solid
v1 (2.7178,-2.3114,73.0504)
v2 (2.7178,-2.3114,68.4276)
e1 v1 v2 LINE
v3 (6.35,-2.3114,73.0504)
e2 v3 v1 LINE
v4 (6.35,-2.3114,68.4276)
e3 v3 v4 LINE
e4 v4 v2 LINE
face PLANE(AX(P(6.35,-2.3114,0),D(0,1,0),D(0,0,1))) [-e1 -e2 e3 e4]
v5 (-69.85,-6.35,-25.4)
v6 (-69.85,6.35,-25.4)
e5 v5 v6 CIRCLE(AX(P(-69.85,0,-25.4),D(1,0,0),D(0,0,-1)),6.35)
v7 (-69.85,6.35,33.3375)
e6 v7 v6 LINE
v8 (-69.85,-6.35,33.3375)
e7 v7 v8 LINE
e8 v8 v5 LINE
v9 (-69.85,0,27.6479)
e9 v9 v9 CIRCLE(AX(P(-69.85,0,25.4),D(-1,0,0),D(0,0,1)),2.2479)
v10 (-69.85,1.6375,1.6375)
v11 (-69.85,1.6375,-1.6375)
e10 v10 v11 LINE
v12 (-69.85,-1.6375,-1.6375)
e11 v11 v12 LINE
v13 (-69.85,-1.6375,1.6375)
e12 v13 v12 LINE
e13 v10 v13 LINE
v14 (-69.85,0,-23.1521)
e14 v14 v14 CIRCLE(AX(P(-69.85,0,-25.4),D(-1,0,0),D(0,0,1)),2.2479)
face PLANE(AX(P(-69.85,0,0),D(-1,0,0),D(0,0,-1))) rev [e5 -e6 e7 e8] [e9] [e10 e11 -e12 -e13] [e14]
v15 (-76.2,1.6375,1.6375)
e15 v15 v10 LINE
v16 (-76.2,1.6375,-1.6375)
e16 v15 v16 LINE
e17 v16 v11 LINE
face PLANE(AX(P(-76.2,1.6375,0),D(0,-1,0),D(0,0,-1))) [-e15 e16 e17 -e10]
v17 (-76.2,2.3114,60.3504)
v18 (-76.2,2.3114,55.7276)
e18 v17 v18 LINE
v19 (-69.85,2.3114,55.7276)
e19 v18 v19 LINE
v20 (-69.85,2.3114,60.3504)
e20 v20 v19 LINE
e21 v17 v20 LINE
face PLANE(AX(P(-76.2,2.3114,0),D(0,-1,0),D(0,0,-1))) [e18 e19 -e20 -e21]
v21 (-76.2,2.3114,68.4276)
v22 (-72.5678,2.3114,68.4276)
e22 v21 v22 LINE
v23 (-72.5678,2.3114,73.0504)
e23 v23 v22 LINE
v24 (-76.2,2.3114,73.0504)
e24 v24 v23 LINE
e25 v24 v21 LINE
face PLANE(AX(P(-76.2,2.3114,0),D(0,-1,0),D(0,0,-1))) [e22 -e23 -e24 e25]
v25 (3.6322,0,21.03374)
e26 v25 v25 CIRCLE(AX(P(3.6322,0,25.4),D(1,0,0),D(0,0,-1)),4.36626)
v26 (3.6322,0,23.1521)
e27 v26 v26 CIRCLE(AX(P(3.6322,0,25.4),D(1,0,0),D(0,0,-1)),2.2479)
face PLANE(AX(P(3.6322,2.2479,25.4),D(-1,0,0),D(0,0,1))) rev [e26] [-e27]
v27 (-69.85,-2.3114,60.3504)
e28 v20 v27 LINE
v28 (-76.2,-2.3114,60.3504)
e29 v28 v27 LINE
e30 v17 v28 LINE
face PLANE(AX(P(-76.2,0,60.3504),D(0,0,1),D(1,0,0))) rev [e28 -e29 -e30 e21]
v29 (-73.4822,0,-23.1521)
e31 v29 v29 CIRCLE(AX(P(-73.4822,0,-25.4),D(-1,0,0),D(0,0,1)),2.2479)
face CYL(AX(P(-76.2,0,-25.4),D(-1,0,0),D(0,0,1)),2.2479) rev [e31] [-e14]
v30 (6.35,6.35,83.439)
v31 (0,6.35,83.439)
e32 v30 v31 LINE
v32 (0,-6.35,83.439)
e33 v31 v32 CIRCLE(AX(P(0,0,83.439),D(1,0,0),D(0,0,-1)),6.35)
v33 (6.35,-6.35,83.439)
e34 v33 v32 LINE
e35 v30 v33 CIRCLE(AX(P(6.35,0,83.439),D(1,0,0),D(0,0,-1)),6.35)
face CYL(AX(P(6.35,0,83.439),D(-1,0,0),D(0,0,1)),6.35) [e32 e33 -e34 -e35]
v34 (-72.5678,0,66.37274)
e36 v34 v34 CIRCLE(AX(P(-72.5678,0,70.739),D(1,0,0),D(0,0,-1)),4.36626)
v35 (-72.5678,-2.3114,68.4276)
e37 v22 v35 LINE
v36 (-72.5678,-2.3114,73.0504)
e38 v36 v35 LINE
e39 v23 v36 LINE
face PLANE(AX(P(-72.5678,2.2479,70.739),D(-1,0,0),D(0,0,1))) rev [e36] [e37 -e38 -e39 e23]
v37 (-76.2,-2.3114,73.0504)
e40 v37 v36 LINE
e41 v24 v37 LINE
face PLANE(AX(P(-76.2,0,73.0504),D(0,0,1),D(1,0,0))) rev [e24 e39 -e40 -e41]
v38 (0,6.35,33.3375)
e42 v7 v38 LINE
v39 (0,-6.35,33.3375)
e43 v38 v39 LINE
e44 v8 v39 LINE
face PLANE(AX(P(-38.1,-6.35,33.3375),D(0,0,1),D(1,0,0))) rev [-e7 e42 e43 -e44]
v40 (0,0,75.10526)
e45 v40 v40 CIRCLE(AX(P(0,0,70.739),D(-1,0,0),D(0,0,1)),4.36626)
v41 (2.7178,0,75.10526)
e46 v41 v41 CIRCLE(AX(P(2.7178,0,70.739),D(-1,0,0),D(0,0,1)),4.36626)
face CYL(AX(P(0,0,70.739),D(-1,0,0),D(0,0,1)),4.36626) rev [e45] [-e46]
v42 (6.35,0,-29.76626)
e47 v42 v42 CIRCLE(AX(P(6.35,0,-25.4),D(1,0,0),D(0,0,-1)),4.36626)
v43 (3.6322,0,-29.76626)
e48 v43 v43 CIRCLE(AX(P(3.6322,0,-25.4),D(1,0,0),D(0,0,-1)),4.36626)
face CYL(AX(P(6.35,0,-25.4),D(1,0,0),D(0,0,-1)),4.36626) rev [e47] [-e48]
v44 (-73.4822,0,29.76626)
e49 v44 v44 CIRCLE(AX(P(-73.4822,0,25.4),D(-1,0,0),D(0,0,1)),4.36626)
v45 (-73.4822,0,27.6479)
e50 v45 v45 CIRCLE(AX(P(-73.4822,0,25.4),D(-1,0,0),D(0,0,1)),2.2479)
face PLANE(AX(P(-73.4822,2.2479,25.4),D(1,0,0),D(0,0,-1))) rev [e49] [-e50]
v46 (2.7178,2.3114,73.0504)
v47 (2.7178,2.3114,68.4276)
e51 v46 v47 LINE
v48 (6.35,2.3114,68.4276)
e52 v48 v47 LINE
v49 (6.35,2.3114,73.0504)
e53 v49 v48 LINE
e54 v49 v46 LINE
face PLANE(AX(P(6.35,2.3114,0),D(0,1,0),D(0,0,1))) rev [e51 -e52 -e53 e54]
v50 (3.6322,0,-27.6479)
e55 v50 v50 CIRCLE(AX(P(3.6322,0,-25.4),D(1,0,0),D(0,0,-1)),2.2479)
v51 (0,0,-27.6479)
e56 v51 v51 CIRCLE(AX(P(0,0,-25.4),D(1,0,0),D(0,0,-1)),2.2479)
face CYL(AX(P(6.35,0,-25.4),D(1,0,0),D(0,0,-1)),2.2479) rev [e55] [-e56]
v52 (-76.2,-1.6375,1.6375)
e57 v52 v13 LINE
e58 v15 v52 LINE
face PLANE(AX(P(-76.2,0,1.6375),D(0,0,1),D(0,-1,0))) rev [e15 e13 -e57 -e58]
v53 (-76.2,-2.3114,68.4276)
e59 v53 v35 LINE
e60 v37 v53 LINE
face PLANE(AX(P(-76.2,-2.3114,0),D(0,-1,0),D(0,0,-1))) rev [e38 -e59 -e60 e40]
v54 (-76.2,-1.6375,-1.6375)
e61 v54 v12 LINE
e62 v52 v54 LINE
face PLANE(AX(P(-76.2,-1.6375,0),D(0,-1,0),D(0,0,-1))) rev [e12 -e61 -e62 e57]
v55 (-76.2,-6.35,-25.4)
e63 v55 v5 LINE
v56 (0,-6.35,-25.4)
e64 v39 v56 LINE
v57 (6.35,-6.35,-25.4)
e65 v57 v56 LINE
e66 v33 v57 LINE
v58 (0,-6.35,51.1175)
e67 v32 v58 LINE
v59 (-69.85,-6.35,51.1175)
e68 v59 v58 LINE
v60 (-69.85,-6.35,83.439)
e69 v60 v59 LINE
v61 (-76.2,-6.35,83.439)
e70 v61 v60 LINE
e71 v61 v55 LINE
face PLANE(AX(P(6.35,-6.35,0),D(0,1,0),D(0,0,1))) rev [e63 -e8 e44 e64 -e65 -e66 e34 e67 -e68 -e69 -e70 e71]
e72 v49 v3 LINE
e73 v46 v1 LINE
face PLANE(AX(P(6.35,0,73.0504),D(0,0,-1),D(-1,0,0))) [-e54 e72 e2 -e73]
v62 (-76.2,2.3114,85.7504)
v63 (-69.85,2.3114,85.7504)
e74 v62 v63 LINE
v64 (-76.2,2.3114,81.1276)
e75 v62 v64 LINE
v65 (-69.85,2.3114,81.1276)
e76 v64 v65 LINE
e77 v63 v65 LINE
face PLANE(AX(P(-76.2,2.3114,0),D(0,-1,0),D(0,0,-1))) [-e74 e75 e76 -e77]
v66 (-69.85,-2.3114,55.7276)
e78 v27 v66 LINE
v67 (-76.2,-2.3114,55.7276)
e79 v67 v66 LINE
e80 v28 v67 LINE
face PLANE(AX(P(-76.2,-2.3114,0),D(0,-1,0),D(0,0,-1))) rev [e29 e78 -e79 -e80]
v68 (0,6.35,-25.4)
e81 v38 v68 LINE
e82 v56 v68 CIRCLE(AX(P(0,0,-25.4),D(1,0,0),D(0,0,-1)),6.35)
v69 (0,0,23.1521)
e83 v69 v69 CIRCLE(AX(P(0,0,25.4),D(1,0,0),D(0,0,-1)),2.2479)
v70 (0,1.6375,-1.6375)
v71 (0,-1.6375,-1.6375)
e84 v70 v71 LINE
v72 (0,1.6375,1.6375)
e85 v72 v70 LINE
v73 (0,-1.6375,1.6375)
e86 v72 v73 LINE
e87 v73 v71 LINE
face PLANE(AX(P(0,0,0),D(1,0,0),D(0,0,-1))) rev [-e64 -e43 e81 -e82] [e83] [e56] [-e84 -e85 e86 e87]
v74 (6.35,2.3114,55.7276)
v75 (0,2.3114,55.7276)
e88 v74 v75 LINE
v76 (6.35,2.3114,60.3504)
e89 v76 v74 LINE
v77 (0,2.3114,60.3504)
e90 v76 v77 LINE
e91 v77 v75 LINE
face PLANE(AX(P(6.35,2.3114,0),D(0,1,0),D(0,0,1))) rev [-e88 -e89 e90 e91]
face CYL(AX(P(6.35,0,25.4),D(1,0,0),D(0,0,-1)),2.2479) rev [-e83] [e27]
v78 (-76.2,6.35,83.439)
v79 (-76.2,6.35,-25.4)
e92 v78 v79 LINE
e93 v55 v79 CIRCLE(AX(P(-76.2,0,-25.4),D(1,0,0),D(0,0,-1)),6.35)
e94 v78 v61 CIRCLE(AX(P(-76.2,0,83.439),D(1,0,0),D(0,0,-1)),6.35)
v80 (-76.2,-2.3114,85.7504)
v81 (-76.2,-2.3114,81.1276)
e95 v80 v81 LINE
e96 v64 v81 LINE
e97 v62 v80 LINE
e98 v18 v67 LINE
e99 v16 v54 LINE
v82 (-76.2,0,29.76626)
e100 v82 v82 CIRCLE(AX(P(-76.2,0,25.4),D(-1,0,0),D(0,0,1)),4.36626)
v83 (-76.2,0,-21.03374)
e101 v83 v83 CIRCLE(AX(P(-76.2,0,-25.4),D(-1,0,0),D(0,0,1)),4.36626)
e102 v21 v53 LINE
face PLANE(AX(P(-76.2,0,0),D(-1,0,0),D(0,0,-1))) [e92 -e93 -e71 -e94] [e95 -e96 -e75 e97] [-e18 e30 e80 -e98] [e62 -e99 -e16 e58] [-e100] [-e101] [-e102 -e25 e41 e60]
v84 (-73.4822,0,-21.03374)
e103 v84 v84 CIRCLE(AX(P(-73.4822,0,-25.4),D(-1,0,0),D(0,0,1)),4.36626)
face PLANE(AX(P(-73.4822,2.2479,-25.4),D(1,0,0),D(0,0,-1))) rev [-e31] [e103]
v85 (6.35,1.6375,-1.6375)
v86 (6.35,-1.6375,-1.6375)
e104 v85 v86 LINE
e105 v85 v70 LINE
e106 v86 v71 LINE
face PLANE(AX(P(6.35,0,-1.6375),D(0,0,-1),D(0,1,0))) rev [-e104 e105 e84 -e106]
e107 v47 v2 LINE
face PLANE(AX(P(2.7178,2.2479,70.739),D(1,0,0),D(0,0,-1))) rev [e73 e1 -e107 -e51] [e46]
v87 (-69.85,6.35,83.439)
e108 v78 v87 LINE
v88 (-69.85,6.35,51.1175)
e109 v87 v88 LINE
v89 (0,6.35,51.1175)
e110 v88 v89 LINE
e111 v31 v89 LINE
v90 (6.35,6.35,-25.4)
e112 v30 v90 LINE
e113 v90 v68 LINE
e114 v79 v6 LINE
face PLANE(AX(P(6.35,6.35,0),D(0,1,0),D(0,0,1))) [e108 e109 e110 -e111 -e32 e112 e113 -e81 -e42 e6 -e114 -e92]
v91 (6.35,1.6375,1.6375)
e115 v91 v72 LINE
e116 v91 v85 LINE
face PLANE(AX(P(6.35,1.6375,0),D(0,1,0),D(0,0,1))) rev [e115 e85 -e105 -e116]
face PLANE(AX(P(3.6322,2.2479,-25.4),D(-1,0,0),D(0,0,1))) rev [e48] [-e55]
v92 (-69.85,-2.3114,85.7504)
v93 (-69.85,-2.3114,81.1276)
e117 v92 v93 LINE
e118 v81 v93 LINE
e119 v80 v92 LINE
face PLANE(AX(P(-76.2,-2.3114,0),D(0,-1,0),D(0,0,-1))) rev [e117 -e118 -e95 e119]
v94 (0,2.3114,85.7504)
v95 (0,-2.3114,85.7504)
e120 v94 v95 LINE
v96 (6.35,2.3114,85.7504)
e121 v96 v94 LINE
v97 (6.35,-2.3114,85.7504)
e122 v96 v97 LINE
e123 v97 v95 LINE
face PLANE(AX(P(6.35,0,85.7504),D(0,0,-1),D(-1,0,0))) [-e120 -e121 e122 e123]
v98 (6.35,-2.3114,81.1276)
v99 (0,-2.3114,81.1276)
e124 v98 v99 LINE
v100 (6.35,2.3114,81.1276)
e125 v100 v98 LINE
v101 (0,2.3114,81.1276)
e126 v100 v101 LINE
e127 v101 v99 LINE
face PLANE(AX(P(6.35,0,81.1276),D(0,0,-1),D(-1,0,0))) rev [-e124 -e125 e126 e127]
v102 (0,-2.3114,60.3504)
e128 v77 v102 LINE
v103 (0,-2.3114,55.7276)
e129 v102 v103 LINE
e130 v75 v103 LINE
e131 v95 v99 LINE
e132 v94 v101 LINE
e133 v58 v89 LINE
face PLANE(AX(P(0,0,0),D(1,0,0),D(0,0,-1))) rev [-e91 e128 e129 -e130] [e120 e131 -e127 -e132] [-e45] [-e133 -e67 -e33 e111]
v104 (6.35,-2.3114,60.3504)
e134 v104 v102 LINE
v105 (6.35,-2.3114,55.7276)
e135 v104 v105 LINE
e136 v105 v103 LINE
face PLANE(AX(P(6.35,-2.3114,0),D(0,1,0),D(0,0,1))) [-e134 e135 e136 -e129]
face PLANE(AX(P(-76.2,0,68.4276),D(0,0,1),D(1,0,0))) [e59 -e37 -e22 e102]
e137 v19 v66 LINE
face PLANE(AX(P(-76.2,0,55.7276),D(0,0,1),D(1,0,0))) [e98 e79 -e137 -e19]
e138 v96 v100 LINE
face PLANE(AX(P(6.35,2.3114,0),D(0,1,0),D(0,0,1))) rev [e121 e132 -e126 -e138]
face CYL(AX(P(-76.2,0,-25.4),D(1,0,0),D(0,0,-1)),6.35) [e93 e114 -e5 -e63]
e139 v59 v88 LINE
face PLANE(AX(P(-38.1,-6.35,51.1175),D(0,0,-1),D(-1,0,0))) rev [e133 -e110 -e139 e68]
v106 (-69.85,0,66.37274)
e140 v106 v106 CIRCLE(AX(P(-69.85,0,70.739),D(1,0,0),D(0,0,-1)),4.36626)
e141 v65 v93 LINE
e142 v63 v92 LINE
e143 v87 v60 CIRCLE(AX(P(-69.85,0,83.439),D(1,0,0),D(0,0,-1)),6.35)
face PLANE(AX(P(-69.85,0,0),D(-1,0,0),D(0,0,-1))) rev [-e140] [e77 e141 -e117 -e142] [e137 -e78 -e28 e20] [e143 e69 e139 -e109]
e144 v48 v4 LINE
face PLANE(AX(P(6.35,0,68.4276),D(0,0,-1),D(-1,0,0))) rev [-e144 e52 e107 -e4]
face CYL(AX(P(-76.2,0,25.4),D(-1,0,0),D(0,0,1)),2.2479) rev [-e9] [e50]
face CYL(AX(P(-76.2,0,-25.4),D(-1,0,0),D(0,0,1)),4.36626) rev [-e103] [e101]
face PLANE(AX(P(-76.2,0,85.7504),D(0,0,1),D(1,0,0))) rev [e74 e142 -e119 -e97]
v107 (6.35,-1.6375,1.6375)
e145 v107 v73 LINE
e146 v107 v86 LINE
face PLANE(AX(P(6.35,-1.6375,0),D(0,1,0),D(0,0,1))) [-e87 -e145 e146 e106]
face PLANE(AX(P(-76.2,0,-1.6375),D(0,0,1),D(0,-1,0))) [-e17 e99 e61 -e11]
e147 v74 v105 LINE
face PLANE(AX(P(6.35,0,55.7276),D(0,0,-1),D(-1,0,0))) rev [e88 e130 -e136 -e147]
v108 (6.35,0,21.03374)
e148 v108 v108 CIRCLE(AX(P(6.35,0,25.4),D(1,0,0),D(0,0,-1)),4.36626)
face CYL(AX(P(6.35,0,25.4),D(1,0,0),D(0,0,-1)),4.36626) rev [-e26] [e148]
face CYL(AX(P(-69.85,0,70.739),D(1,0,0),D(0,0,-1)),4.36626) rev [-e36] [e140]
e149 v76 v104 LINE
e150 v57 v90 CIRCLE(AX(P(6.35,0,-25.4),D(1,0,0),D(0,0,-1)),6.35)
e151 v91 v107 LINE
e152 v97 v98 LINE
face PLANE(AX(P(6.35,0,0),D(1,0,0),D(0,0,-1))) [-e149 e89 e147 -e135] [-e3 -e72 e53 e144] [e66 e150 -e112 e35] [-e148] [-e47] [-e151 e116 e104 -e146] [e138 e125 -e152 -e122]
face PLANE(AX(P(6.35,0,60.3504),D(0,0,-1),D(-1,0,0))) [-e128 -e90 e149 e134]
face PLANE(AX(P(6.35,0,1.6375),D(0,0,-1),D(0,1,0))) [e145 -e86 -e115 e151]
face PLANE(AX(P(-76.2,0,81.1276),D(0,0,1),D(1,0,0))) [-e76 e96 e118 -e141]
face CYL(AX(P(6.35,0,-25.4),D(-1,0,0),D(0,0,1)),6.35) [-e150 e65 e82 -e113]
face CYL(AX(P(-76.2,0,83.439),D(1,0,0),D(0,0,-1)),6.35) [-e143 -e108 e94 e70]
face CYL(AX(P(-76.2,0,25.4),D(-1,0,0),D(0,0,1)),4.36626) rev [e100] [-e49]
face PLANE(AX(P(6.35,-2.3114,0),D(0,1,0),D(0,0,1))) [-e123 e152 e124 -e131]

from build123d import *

# Parameters (mm, degrees)
SKETCH1_W                                      = 3.275
SKETCH1_H                                      = 3.275
SKETCH1_W_2                                    = 4.6228
SKETCH1_H_2                                    = 4.6228
BOSS_EXTRUDE1_DEPTH                            = 6.35
CBORE_FOR_8_BUTTON_HEAD_CAP_SCREW1_D           = 4.4958
CBORE_FOR_8_BUTTON_HEAD_CAP_SCREW1_CBORE_D     = 8.73252
CBORE_FOR_8_BUTTON_HEAD_CAP_SCREW1_CBORE_DEPTH = 2.7178
CBORE_FOR_8_BUTTON_HEAD_CAP_SCREW2_D           = 4.4958
CBORE_FOR_8_BUTTON_HEAD_CAP_SCREW2_CBORE_D     = 8.73252
CBORE_FOR_8_BUTTON_HEAD_CAP_SCREW2_CBORE_DEPTH = 2.7178
SKETCH10_W                                     = 17.78
SKETCH10_H                                     = 12.7
BOSS_EXTRUDE2_DEPTH                            = 38.1
MIRROR5_START                                  = -76.2
MIRROR5_OUTLINE_R                              = 4.36626
MIRROR5_OUTLINE_W                              = 3.275
MIRROR5_OUTLINE_H                              = 3.275
MIRROR5_OUTLINE_W_2                            = 4.6228
MIRROR5_OUTLINE_H_2                            = 4.6228
MIRROR5_DEPTH                                  = 6.35
MIRROR5_START_2                                = -73.4822
MIRROR5_2_OUTLINE_R                            = 4.36626
MIRROR5_2_OUTLINE_R_2                          = 2.2479
MIRROR5_2_DEPTH                                = 3.6322
MIRROR5_3_OUTLINE_R                            = 4.36626
MIRROR5_3_OUTLINE_W                            = 4.6228
MIRROR5_3_OUTLINE_H                            = 4.6228
MIRROR5_3_DEPTH                                = 3.6322


# Read off the part's stored shape, not the designer's step: Mirror5
with BuildPart() as part:
    # Sketch1 → Boss-Extrude1 (new body)
    with BuildSketch(Plane(origin=(0, 0, 0), x_dir=(0, 0, -1), z_dir=(1, 0, 0))):
        with BuildLine():
            Line((-83.439, -6.35), (25.4, -6.35))
            ThreePointArc((25.4, -6.35), (31.75, 0), (25.4, 6.35))
            Line((25.4, 6.35), (-83.439, 6.35))
            ThreePointArc((-83.439, 6.35), (-89.789, 0), (-83.439, -6.35))
        make_face()
        Rectangle(SKETCH1_W, SKETCH1_H, mode=Mode.SUBTRACT)
        with Locations((-83.439, 0)):
            Rectangle(SKETCH1_W_2, SKETCH1_H_2, mode=Mode.SUBTRACT)
        with Locations((-58.039, 0)):
            Rectangle(SKETCH1_W_2, SKETCH1_H_2, mode=Mode.SUBTRACT)
        with Locations((-70.739, 0)):
            Rectangle(SKETCH1_W_2, SKETCH1_H_2, mode=Mode.SUBTRACT)
    extrude(amount=BOSS_EXTRUDE1_DEPTH)

    # CBORE for #8 Button Head Cap Screw1 (through all)
    with Locations(Plane(origin=(6.35, 0, 25.4), x_dir=(0, 0, 1), z_dir=(1, 0, 0))):
        with Locations((0, 0), (-50.8, 0)):
            CounterBoreHole(CBORE_FOR_8_BUTTON_HEAD_CAP_SCREW1_D / 2, CBORE_FOR_8_BUTTON_HEAD_CAP_SCREW1_CBORE_D / 2, CBORE_FOR_8_BUTTON_HEAD_CAP_SCREW1_CBORE_DEPTH)

    # CBORE for #8 Button Head Cap Screw2 (through all)
    with Locations(Plane(origin=(0, 0, 70.739), x_dir=(0, 0, -1), z_dir=(-1, 0, 0))):
        with Locations((0, 0)):
            CounterBoreHole(CBORE_FOR_8_BUTTON_HEAD_CAP_SCREW2_D / 2, CBORE_FOR_8_BUTTON_HEAD_CAP_SCREW2_CBORE_D / 2, CBORE_FOR_8_BUTTON_HEAD_CAP_SCREW2_CBORE_DEPTH)

    # Sketch10 → Boss-Extrude2 (add)
    with BuildSketch(Plane.ZY):
        with Locations((42.2275, 0)):
            Rectangle(SKETCH10_W, SKETCH10_H)
    boss_extrude2 = extrude(amount=BOSS_EXTRUDE2_DEPTH)

    # Mirror4: Boss-Extrude2 across plane
    add(boss_extrude2.mirror(Plane.ZY.offset(34.925)))

    # Mirror5 outline → Mirror5 (add)
    with BuildSketch(Plane.YZ.offset(MIRROR5_START)):
        with BuildLine():
            Line((6.35, -25.4), (6.35, 83.439))
            ThreePointArc((6.35, 83.439), (0, 89.789), (-6.35, 83.439))
            Line((-6.35, 83.439), (-6.35, -25.4))
            ThreePointArc((-6.35, -25.4), (0, -31.75), (6.35, -25.4))
        make_face()
        with Locations((0, -25.4)):
            Circle(MIRROR5_OUTLINE_R, mode=Mode.SUBTRACT)
        Rectangle(MIRROR5_OUTLINE_W, MIRROR5_OUTLINE_H, mode=Mode.SUBTRACT)
        with Locations((0, 25.4)):
            Circle(MIRROR5_OUTLINE_R, mode=Mode.SUBTRACT)
        with Locations((0, 58.039)):
            Rectangle(MIRROR5_OUTLINE_W_2, MIRROR5_OUTLINE_H_2, mode=Mode.SUBTRACT)
        with Locations((0, 70.739)):
            Circle(MIRROR5_OUTLINE_R, mode=Mode.SUBTRACT)
        with Locations((0, 83.439)):
            Rectangle(MIRROR5_OUTLINE_W_2, MIRROR5_OUTLINE_H_2, mode=Mode.SUBTRACT)
    extrude(amount=MIRROR5_DEPTH)

    # Mirror5 2 outline → Mirror5 2 (add)
    # profile 1 of 2: a face of its own
    with BuildSketch(Plane.YZ.offset(MIRROR5_START_2)):
        with Locations((0, -25.4)):
            Circle(MIRROR5_2_OUTLINE_R)
        with Locations((0, -25.4)):
            Circle(MIRROR5_2_OUTLINE_R_2, mode=Mode.SUBTRACT)
    # profile 2 of 2: a face of its own
    with BuildSketch(Plane.YZ.offset(MIRROR5_START_2)):
        with Locations((0, 25.4)):
            Circle(MIRROR5_2_OUTLINE_R)
        with Locations((0, 25.4)):
            Circle(MIRROR5_2_OUTLINE_R_2, mode=Mode.SUBTRACT)
    extrude(amount=MIRROR5_2_DEPTH)

    # Mirror5 3 outline → Mirror5 3 (add)
    with BuildSketch(Plane.YZ.offset(MIRROR5_START)):
        with Locations((0, 70.739)):
            Circle(MIRROR5_3_OUTLINE_R)
        with Locations((0, 70.739)):
            Rectangle(MIRROR5_3_OUTLINE_W, MIRROR5_3_OUTLINE_H, mode=Mode.SUBTRACT)
    extrude(amount=MIRROR5_3_DEPTH)


solid = part.part
